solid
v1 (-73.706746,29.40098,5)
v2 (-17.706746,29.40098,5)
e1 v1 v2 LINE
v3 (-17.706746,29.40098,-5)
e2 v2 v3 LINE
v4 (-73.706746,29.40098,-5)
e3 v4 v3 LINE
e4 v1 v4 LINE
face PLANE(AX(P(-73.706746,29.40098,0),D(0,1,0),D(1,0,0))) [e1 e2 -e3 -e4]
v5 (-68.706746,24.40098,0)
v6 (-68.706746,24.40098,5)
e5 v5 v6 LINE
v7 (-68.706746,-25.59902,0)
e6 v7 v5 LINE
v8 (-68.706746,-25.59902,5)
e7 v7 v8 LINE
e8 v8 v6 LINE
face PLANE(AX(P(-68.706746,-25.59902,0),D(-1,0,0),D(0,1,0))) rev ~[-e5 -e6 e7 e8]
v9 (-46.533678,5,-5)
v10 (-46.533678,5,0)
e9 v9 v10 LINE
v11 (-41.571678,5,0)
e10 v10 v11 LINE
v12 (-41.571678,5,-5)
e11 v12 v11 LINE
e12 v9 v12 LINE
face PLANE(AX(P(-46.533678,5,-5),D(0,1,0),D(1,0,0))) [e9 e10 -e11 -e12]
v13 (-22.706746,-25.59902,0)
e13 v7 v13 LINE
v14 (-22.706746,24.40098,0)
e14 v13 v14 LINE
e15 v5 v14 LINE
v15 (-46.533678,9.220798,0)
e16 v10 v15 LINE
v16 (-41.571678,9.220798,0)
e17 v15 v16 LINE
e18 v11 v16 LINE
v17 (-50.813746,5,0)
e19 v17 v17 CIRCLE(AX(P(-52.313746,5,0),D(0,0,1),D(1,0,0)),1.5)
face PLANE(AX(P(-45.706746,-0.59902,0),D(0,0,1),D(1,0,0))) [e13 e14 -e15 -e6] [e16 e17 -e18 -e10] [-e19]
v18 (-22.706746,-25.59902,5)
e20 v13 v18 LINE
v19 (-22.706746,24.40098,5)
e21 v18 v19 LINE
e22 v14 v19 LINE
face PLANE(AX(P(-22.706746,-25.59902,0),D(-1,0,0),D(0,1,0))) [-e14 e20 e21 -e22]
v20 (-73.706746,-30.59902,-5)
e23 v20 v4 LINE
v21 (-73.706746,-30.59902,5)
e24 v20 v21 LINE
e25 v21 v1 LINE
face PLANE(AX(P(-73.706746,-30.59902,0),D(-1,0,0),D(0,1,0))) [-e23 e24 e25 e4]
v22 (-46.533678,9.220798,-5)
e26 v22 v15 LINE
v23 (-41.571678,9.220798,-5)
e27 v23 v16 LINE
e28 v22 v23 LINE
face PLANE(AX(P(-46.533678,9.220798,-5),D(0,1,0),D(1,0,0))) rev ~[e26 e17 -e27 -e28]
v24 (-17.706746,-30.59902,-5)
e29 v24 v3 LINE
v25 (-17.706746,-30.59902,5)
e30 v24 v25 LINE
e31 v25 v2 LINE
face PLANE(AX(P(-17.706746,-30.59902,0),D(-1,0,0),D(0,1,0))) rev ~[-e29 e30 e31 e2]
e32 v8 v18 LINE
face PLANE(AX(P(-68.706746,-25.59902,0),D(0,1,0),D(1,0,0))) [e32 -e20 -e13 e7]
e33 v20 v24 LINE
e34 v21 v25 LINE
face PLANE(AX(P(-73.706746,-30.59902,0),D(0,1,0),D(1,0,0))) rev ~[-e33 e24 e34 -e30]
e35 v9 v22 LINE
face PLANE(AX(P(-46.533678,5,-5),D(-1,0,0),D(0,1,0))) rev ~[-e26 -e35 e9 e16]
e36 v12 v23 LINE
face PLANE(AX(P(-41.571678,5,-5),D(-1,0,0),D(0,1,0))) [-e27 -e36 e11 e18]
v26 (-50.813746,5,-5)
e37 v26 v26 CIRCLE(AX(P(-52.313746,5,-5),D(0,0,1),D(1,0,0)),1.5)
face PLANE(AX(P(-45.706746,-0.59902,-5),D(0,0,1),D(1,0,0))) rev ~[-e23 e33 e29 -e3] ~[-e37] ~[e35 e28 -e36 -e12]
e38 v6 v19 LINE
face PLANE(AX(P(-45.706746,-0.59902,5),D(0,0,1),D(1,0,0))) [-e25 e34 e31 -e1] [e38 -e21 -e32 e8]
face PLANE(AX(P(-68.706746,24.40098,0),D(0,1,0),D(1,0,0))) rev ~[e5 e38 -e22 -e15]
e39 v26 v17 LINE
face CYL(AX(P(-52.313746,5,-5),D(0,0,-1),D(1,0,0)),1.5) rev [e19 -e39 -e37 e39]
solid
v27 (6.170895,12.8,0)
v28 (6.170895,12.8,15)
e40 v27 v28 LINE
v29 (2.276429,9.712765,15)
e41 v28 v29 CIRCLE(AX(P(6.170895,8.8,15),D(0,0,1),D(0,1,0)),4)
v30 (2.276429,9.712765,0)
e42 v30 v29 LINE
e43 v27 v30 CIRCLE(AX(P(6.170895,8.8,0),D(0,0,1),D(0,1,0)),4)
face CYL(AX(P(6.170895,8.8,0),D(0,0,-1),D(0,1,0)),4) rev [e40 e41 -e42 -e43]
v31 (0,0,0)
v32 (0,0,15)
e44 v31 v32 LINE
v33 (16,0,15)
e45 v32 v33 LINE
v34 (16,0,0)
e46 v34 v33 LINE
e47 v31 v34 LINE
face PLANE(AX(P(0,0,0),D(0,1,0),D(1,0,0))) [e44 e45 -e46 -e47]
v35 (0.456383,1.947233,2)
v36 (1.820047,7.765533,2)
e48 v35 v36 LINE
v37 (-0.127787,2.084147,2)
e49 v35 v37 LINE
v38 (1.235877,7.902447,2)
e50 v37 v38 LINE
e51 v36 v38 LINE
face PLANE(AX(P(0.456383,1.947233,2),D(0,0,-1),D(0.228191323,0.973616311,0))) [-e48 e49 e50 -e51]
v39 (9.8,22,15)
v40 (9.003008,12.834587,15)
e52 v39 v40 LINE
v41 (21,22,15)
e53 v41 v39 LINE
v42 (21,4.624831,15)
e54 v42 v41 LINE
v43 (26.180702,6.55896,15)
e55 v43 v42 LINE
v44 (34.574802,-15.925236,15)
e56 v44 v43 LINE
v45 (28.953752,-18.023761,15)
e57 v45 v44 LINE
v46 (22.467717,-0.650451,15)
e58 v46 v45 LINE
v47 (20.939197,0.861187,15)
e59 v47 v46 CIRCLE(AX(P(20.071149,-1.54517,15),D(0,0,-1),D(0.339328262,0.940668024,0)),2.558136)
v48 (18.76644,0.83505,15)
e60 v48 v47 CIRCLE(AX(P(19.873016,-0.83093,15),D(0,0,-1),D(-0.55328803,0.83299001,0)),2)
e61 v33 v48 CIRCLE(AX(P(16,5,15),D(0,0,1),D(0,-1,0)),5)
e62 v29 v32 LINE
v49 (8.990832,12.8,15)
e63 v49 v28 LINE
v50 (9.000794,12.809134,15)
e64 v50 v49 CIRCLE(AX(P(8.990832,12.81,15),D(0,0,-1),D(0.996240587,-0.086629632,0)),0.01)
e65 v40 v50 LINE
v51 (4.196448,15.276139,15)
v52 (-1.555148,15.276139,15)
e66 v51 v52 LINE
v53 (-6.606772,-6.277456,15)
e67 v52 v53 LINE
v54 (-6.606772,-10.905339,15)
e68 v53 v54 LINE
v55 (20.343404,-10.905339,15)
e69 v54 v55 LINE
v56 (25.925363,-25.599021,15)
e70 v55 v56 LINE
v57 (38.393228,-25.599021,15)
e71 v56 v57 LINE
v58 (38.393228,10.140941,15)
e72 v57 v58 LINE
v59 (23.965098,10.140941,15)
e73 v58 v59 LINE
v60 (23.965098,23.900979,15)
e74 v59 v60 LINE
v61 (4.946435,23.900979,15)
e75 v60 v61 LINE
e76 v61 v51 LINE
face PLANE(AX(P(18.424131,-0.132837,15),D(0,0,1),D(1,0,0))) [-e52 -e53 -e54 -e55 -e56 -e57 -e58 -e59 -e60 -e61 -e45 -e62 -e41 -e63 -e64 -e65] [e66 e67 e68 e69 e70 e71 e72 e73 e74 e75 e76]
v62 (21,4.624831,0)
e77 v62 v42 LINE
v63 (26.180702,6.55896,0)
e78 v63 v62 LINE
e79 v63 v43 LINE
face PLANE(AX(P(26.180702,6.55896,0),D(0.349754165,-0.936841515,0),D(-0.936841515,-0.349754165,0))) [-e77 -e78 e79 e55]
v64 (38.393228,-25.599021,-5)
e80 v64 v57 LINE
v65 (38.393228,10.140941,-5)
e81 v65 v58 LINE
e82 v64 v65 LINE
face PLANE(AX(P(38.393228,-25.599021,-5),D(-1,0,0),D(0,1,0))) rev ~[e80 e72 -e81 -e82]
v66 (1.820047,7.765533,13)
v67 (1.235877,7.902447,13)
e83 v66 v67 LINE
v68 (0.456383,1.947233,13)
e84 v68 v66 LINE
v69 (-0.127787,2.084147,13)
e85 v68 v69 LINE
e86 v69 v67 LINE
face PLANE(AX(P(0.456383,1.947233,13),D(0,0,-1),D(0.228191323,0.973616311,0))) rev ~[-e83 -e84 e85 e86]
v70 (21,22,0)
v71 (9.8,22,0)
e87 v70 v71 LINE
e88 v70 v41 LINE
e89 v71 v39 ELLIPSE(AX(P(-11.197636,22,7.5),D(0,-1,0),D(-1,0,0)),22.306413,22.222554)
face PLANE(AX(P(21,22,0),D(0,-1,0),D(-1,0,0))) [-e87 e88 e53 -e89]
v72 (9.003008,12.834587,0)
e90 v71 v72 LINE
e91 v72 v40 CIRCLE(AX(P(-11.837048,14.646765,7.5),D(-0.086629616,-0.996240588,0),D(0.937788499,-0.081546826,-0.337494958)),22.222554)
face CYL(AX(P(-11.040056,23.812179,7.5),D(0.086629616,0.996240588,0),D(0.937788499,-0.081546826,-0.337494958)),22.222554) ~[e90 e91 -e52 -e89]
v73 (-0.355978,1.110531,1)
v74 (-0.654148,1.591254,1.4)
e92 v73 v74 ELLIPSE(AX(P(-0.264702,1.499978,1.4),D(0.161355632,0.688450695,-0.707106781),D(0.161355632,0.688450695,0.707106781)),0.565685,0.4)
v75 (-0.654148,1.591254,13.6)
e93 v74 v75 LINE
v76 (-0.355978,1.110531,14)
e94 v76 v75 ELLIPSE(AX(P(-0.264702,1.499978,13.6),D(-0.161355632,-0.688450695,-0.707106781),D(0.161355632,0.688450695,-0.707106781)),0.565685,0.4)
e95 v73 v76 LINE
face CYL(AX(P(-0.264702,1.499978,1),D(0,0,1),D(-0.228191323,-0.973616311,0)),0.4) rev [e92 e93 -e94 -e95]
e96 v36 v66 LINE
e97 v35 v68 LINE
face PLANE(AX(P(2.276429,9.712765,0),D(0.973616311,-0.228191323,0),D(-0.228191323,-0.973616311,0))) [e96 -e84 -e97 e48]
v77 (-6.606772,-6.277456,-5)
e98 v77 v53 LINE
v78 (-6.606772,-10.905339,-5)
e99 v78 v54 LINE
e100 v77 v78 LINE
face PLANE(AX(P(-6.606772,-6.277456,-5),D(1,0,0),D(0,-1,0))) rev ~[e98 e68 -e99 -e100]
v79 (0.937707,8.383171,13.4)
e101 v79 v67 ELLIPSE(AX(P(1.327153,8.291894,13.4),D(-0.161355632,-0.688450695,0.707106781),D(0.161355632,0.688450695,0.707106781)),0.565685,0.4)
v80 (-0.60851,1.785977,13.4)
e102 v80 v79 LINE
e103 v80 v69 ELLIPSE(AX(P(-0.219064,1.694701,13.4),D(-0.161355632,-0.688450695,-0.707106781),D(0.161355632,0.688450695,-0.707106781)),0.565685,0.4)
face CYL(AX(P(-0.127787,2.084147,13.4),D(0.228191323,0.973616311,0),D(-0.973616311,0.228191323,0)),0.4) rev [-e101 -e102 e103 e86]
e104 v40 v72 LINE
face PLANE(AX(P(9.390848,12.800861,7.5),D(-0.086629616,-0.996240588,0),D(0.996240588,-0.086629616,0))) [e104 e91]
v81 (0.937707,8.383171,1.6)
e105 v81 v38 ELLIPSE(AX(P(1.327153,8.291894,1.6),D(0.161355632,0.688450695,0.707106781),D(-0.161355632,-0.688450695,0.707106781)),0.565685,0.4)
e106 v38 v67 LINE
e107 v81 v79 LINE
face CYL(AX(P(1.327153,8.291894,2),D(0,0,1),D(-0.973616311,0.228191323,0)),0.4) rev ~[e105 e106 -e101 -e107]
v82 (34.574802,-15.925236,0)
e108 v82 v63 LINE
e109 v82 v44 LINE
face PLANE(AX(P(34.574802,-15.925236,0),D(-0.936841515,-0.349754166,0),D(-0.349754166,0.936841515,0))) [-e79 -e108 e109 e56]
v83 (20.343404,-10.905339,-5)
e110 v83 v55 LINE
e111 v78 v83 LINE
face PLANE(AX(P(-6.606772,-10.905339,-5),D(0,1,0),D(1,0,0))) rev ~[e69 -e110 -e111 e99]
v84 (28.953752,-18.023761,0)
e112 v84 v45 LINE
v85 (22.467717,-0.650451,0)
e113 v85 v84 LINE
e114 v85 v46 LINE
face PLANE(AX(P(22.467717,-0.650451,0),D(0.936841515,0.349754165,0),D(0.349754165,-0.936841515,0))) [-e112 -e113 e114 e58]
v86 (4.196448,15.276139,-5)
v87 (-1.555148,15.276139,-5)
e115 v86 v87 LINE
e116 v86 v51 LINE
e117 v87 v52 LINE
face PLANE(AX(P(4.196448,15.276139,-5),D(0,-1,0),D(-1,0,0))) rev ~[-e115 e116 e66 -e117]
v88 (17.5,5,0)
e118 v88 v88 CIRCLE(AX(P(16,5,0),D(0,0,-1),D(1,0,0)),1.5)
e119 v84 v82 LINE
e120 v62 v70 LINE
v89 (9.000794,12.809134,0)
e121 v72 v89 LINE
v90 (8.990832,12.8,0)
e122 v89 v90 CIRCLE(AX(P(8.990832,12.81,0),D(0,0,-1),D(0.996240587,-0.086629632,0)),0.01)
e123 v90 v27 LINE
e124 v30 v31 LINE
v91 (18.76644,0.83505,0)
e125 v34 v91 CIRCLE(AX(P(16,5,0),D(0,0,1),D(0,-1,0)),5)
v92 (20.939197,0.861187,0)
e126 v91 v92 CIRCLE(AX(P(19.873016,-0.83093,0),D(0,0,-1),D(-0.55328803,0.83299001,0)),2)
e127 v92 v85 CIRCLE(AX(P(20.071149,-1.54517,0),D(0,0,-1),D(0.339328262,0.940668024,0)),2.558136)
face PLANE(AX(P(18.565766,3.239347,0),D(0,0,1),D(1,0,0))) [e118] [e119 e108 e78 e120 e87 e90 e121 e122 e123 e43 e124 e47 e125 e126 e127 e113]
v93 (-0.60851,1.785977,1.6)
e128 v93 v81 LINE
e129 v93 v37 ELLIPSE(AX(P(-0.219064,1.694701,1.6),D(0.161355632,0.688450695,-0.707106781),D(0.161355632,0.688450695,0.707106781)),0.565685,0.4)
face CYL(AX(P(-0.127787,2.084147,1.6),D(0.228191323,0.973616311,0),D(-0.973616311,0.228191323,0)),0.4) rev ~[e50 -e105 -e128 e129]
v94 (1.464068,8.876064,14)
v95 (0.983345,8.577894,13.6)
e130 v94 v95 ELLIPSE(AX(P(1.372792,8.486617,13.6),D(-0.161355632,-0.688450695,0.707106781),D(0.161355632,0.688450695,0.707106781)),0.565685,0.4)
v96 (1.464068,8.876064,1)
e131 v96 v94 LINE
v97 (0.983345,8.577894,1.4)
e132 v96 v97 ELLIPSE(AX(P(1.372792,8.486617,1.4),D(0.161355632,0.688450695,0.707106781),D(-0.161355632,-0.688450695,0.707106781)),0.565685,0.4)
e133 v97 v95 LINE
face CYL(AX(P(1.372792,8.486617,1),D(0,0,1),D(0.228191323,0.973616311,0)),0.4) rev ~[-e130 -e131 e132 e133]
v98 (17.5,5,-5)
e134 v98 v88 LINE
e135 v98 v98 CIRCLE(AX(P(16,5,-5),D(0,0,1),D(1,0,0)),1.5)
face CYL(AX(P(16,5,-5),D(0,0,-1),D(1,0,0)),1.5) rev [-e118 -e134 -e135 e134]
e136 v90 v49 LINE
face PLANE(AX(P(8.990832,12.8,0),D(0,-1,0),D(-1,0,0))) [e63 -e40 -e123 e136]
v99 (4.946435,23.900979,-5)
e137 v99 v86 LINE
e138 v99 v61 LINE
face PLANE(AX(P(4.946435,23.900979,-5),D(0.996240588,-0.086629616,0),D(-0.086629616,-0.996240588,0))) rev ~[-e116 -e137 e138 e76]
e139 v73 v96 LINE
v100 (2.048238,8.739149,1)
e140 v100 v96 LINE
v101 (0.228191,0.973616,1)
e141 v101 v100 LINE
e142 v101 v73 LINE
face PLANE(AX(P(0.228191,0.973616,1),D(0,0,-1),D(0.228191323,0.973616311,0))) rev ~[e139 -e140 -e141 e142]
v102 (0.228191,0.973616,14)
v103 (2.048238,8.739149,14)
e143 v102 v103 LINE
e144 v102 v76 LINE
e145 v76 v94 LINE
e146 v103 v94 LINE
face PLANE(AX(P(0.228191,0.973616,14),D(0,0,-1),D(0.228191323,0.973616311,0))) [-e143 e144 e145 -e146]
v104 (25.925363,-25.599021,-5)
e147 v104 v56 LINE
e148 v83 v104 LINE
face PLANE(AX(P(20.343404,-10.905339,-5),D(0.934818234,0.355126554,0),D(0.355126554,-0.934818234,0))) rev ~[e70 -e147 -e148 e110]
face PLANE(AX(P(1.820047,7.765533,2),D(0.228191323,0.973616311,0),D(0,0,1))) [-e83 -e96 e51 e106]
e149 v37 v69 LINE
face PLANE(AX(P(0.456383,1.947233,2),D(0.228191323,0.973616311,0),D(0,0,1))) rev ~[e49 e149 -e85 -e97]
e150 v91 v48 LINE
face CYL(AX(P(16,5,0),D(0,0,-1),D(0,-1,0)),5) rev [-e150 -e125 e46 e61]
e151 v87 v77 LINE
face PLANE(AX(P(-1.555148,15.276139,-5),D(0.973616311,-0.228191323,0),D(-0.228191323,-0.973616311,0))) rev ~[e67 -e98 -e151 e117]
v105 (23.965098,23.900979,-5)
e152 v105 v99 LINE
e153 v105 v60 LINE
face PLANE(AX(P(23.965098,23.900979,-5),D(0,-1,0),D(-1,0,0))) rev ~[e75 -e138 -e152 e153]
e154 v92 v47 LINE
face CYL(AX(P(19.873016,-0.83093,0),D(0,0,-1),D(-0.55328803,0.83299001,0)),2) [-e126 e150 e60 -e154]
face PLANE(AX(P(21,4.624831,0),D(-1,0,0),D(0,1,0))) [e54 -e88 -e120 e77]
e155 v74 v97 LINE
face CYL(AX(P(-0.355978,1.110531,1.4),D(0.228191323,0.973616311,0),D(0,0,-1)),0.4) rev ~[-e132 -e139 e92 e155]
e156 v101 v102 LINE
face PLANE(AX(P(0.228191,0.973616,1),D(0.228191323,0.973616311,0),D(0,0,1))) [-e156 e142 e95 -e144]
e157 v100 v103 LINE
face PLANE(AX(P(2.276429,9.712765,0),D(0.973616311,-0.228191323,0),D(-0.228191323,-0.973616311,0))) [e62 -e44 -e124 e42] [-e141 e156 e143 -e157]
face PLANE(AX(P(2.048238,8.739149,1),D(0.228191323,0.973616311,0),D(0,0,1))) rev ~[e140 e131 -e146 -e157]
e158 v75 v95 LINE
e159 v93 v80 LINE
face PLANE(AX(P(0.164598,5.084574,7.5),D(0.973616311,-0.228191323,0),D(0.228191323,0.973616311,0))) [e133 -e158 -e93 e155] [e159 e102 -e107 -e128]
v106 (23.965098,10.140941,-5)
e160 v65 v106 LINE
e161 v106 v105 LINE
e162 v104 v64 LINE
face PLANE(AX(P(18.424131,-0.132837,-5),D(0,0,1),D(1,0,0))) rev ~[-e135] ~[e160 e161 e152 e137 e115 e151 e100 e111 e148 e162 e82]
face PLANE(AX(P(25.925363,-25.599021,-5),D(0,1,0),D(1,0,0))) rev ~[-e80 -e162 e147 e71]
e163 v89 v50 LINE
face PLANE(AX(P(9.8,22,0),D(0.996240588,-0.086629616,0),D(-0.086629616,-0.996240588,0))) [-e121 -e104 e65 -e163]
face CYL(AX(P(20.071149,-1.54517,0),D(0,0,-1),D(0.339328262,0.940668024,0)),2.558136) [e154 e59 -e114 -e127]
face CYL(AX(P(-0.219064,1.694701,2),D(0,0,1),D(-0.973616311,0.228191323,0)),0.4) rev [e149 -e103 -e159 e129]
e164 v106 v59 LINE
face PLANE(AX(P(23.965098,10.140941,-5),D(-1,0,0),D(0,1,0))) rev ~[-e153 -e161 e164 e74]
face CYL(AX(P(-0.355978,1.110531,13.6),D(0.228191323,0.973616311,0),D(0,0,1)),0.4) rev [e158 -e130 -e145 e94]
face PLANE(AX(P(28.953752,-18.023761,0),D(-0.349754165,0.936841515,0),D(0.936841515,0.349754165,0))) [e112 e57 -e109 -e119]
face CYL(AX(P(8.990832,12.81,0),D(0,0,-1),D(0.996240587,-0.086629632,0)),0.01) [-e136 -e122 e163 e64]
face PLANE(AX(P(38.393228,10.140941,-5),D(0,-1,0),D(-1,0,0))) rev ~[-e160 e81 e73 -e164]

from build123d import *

# Parameters (mm, degrees)
F1_DEPTH      = 15
F4_DEPTH      = 9.2
F4_DEPTH_BACK = 1
F6_R          = 1.5
F7_DEPTH      = 20
F9_R          = 1.5
F10_DEPTH     = 5
F11_W         = 56
F11_H         = 60
F11_R         = 1.5
F11_W_2       = 4.962
F11_H_2       = 4.2207975686
F12_DEPTH     = 5
F14_W         = 56
F14_H         = 60
F14_W_2       = 46
F14_H_2       = 50
F15_DEPTH     = 5
F20_W         = 7.9759681362
F20_H         = 13
F20_W_2       = 5.9759681362
F20_H_2       = 11
F21_DEPTH     = 1
F22_R         = 0.4


# Not quite as in the source:
# - the program builds the solid bodies; features that only make, move or delete a surface that nothing else refers to are left out


with BuildPart() as f1:
    # F0 (on Top) → F1 (new body)
    with BuildSketch(Plane.XY):
        with BuildLine():
            Line((2.2764293651, 9.7127652912), (0, 0))
            Line((0, 0), (16, 0))
            ThreePointArc((16, 0), (17.4448615439, 0.2133127198), (18.7664401496, 0.8350499525))
            ThreePointArc((18.7664401496, 0.8350499525), (19.8489592754, 1.1689252442), (20.9391965895, 0.8611867726))
            ThreePointArc((20.9391965895, 0.8611867726), (21.8699515292, 0.2737220948), (22.4677167157, -0.6504512046))
            Line((22.4677167157, -0.6504512046), (28.953752481, -18.0237612902))
            Line((28.953752481, -18.0237612902), (34.5748015694, -15.9252362972))
            Line((34.5748015694, -15.9252362972), (26.1807015974, 6.5589600562))
            Line((26.1807015974, 6.5589600562), (21, 4.6248314599))
            Line((21, 4.6248314599), (21, 22))
            Line((21, 22), (9.8, 22))
            Line((9.8, 22), (9.0007942351, 12.8091337038))
            ThreePointArc((9.0007942351, 12.8091337038), (8.9975896779, 12.8026290109), (8.9908318292, 12.8))
            Line((8.9908318292, 12.8), (6.1708946074, 12.8))
            ThreePointArc((6.1708946074, 12.8), (3.6860466407, 11.9345702389), (2.2764293651, 9.7127652912))
        make_face()
    extrude(amount=F1_DEPTH)

    # F3 (on face) → F4 (cut, two sides)
    with BuildSketch(Plane(origin=(1.9722326454, 22.6806754221, 0), x_dir=(0.9962405882, -0.0866296164, 0), z_dir=(-0.0866296164, -0.9962405882, 0))) as f4_sk:
        with BuildLine():
            Line((7.8573062043, 15), (7.8573062043, 0))
            ThreePointArc((7.8573062043, 0), (9.161162664, 7.5), (7.8573062043, 15))
        make_face()
    extrude(amount=F4_DEPTH, mode=Mode.SUBTRACT)
    extrude(f4_sk.sketch, amount=-F4_DEPTH_BACK, mode=Mode.SUBTRACT)


with BuildPart() as f7:
    # F6 (on offset) → F7 (new body)
    with BuildSketch(Plane.XY.offset(-5)):
        Polygon((23.9650979638, 23.9009789079), (4.9464345222, 23.9009789079), (4.1964484146, 15.2761386707), (-1.5551482583, 15.2761386707), (-6.6067720969, -6.2774563741), (-6.6067720969, -10.9053393826), (20.3434042633, -10.9053393826), (25.9253627227, -25.5990210921), (38.3932279031, -25.5990210921), (38.3932279031, 10.140940547), (23.9650979638, 10.140940547), align=None)
        with Locations((16, 5)):
            Circle(F6_R, mode=Mode.SUBTRACT)
    extrude(amount=F7_DEPTH)

    # F8: cut F1
    add(f1.part, mode=Mode.SUBTRACT)

    # F9 (on offset) → F10 (cut)
    with BuildSketch(Plane.XY.offset(-5)):
        with Locations((16, 5)):
            Circle(F9_R)
    extrude(amount=F10_DEPTH, mode=Mode.SUBTRACT)

    # F20 (on offset) → F21 (cut)
    with BuildSketch(Plane(origin=(0, 0, 0), x_dir=(0.2281913228, 0.9736163106, 0), z_dir=(0.9736163106, -0.2281913228, 0))):
        with Locations((4.9879840681, 7.5)):
            Rectangle(F20_W, F20_H)
        with Locations((4.9879840681, 7.5)):
            Rectangle(F20_W_2, F20_H_2, mode=Mode.SUBTRACT)
    extrude(amount=-F21_DEPTH, mode=Mode.SUBTRACT)

    # F22
    f22_edges = [f7.edges().sort_by_distance(p)[0] for p in [
        (1.074622, 8.96734, 7.5),
        (0.164598, 5.084574, 14),
        (-0.745425, 1.201808, 7.5),
        (0.164598, 5.084574, 1),
        (0.84643, 7.993724, 7.5),
        (0.164598, 5.084574, 13),
        (-0.517234, 2.175424, 7.5),
        (0.164598, 5.084574, 2),
    ]]
    fillet(f22_edges, radius=F22_R)


with BuildPart() as f12:
    # F11 (on offset) → F12 (new body)
    with BuildSketch(Plane.XY.offset(-5)):
        with Locations((-45.7067461014, -0.5990204215)):
            Rectangle(F11_W, F11_H)
        with Locations((-52.3137461014, 5)):
            Circle(F11_R, mode=Mode.SUBTRACT)
        with Locations((-44.052677727, 7.1103987843)):
            Rectangle(F11_W_2, F11_H_2, mode=Mode.SUBTRACT)
    extrude(amount=F12_DEPTH)

    # F14 (on offset) → F15 (join)
    with BuildSketch(Plane.XY):
        with Locations((-45.7067461014, -0.5990204215)):
            Rectangle(F14_W, F14_H)
        with Locations((-45.7067461014, -0.5990204215)):
            Rectangle(F14_W_2, F14_H_2, mode=Mode.SUBTRACT)
    extrude(amount=F15_DEPTH)


solid = Compound([f7.part, f12.part])
